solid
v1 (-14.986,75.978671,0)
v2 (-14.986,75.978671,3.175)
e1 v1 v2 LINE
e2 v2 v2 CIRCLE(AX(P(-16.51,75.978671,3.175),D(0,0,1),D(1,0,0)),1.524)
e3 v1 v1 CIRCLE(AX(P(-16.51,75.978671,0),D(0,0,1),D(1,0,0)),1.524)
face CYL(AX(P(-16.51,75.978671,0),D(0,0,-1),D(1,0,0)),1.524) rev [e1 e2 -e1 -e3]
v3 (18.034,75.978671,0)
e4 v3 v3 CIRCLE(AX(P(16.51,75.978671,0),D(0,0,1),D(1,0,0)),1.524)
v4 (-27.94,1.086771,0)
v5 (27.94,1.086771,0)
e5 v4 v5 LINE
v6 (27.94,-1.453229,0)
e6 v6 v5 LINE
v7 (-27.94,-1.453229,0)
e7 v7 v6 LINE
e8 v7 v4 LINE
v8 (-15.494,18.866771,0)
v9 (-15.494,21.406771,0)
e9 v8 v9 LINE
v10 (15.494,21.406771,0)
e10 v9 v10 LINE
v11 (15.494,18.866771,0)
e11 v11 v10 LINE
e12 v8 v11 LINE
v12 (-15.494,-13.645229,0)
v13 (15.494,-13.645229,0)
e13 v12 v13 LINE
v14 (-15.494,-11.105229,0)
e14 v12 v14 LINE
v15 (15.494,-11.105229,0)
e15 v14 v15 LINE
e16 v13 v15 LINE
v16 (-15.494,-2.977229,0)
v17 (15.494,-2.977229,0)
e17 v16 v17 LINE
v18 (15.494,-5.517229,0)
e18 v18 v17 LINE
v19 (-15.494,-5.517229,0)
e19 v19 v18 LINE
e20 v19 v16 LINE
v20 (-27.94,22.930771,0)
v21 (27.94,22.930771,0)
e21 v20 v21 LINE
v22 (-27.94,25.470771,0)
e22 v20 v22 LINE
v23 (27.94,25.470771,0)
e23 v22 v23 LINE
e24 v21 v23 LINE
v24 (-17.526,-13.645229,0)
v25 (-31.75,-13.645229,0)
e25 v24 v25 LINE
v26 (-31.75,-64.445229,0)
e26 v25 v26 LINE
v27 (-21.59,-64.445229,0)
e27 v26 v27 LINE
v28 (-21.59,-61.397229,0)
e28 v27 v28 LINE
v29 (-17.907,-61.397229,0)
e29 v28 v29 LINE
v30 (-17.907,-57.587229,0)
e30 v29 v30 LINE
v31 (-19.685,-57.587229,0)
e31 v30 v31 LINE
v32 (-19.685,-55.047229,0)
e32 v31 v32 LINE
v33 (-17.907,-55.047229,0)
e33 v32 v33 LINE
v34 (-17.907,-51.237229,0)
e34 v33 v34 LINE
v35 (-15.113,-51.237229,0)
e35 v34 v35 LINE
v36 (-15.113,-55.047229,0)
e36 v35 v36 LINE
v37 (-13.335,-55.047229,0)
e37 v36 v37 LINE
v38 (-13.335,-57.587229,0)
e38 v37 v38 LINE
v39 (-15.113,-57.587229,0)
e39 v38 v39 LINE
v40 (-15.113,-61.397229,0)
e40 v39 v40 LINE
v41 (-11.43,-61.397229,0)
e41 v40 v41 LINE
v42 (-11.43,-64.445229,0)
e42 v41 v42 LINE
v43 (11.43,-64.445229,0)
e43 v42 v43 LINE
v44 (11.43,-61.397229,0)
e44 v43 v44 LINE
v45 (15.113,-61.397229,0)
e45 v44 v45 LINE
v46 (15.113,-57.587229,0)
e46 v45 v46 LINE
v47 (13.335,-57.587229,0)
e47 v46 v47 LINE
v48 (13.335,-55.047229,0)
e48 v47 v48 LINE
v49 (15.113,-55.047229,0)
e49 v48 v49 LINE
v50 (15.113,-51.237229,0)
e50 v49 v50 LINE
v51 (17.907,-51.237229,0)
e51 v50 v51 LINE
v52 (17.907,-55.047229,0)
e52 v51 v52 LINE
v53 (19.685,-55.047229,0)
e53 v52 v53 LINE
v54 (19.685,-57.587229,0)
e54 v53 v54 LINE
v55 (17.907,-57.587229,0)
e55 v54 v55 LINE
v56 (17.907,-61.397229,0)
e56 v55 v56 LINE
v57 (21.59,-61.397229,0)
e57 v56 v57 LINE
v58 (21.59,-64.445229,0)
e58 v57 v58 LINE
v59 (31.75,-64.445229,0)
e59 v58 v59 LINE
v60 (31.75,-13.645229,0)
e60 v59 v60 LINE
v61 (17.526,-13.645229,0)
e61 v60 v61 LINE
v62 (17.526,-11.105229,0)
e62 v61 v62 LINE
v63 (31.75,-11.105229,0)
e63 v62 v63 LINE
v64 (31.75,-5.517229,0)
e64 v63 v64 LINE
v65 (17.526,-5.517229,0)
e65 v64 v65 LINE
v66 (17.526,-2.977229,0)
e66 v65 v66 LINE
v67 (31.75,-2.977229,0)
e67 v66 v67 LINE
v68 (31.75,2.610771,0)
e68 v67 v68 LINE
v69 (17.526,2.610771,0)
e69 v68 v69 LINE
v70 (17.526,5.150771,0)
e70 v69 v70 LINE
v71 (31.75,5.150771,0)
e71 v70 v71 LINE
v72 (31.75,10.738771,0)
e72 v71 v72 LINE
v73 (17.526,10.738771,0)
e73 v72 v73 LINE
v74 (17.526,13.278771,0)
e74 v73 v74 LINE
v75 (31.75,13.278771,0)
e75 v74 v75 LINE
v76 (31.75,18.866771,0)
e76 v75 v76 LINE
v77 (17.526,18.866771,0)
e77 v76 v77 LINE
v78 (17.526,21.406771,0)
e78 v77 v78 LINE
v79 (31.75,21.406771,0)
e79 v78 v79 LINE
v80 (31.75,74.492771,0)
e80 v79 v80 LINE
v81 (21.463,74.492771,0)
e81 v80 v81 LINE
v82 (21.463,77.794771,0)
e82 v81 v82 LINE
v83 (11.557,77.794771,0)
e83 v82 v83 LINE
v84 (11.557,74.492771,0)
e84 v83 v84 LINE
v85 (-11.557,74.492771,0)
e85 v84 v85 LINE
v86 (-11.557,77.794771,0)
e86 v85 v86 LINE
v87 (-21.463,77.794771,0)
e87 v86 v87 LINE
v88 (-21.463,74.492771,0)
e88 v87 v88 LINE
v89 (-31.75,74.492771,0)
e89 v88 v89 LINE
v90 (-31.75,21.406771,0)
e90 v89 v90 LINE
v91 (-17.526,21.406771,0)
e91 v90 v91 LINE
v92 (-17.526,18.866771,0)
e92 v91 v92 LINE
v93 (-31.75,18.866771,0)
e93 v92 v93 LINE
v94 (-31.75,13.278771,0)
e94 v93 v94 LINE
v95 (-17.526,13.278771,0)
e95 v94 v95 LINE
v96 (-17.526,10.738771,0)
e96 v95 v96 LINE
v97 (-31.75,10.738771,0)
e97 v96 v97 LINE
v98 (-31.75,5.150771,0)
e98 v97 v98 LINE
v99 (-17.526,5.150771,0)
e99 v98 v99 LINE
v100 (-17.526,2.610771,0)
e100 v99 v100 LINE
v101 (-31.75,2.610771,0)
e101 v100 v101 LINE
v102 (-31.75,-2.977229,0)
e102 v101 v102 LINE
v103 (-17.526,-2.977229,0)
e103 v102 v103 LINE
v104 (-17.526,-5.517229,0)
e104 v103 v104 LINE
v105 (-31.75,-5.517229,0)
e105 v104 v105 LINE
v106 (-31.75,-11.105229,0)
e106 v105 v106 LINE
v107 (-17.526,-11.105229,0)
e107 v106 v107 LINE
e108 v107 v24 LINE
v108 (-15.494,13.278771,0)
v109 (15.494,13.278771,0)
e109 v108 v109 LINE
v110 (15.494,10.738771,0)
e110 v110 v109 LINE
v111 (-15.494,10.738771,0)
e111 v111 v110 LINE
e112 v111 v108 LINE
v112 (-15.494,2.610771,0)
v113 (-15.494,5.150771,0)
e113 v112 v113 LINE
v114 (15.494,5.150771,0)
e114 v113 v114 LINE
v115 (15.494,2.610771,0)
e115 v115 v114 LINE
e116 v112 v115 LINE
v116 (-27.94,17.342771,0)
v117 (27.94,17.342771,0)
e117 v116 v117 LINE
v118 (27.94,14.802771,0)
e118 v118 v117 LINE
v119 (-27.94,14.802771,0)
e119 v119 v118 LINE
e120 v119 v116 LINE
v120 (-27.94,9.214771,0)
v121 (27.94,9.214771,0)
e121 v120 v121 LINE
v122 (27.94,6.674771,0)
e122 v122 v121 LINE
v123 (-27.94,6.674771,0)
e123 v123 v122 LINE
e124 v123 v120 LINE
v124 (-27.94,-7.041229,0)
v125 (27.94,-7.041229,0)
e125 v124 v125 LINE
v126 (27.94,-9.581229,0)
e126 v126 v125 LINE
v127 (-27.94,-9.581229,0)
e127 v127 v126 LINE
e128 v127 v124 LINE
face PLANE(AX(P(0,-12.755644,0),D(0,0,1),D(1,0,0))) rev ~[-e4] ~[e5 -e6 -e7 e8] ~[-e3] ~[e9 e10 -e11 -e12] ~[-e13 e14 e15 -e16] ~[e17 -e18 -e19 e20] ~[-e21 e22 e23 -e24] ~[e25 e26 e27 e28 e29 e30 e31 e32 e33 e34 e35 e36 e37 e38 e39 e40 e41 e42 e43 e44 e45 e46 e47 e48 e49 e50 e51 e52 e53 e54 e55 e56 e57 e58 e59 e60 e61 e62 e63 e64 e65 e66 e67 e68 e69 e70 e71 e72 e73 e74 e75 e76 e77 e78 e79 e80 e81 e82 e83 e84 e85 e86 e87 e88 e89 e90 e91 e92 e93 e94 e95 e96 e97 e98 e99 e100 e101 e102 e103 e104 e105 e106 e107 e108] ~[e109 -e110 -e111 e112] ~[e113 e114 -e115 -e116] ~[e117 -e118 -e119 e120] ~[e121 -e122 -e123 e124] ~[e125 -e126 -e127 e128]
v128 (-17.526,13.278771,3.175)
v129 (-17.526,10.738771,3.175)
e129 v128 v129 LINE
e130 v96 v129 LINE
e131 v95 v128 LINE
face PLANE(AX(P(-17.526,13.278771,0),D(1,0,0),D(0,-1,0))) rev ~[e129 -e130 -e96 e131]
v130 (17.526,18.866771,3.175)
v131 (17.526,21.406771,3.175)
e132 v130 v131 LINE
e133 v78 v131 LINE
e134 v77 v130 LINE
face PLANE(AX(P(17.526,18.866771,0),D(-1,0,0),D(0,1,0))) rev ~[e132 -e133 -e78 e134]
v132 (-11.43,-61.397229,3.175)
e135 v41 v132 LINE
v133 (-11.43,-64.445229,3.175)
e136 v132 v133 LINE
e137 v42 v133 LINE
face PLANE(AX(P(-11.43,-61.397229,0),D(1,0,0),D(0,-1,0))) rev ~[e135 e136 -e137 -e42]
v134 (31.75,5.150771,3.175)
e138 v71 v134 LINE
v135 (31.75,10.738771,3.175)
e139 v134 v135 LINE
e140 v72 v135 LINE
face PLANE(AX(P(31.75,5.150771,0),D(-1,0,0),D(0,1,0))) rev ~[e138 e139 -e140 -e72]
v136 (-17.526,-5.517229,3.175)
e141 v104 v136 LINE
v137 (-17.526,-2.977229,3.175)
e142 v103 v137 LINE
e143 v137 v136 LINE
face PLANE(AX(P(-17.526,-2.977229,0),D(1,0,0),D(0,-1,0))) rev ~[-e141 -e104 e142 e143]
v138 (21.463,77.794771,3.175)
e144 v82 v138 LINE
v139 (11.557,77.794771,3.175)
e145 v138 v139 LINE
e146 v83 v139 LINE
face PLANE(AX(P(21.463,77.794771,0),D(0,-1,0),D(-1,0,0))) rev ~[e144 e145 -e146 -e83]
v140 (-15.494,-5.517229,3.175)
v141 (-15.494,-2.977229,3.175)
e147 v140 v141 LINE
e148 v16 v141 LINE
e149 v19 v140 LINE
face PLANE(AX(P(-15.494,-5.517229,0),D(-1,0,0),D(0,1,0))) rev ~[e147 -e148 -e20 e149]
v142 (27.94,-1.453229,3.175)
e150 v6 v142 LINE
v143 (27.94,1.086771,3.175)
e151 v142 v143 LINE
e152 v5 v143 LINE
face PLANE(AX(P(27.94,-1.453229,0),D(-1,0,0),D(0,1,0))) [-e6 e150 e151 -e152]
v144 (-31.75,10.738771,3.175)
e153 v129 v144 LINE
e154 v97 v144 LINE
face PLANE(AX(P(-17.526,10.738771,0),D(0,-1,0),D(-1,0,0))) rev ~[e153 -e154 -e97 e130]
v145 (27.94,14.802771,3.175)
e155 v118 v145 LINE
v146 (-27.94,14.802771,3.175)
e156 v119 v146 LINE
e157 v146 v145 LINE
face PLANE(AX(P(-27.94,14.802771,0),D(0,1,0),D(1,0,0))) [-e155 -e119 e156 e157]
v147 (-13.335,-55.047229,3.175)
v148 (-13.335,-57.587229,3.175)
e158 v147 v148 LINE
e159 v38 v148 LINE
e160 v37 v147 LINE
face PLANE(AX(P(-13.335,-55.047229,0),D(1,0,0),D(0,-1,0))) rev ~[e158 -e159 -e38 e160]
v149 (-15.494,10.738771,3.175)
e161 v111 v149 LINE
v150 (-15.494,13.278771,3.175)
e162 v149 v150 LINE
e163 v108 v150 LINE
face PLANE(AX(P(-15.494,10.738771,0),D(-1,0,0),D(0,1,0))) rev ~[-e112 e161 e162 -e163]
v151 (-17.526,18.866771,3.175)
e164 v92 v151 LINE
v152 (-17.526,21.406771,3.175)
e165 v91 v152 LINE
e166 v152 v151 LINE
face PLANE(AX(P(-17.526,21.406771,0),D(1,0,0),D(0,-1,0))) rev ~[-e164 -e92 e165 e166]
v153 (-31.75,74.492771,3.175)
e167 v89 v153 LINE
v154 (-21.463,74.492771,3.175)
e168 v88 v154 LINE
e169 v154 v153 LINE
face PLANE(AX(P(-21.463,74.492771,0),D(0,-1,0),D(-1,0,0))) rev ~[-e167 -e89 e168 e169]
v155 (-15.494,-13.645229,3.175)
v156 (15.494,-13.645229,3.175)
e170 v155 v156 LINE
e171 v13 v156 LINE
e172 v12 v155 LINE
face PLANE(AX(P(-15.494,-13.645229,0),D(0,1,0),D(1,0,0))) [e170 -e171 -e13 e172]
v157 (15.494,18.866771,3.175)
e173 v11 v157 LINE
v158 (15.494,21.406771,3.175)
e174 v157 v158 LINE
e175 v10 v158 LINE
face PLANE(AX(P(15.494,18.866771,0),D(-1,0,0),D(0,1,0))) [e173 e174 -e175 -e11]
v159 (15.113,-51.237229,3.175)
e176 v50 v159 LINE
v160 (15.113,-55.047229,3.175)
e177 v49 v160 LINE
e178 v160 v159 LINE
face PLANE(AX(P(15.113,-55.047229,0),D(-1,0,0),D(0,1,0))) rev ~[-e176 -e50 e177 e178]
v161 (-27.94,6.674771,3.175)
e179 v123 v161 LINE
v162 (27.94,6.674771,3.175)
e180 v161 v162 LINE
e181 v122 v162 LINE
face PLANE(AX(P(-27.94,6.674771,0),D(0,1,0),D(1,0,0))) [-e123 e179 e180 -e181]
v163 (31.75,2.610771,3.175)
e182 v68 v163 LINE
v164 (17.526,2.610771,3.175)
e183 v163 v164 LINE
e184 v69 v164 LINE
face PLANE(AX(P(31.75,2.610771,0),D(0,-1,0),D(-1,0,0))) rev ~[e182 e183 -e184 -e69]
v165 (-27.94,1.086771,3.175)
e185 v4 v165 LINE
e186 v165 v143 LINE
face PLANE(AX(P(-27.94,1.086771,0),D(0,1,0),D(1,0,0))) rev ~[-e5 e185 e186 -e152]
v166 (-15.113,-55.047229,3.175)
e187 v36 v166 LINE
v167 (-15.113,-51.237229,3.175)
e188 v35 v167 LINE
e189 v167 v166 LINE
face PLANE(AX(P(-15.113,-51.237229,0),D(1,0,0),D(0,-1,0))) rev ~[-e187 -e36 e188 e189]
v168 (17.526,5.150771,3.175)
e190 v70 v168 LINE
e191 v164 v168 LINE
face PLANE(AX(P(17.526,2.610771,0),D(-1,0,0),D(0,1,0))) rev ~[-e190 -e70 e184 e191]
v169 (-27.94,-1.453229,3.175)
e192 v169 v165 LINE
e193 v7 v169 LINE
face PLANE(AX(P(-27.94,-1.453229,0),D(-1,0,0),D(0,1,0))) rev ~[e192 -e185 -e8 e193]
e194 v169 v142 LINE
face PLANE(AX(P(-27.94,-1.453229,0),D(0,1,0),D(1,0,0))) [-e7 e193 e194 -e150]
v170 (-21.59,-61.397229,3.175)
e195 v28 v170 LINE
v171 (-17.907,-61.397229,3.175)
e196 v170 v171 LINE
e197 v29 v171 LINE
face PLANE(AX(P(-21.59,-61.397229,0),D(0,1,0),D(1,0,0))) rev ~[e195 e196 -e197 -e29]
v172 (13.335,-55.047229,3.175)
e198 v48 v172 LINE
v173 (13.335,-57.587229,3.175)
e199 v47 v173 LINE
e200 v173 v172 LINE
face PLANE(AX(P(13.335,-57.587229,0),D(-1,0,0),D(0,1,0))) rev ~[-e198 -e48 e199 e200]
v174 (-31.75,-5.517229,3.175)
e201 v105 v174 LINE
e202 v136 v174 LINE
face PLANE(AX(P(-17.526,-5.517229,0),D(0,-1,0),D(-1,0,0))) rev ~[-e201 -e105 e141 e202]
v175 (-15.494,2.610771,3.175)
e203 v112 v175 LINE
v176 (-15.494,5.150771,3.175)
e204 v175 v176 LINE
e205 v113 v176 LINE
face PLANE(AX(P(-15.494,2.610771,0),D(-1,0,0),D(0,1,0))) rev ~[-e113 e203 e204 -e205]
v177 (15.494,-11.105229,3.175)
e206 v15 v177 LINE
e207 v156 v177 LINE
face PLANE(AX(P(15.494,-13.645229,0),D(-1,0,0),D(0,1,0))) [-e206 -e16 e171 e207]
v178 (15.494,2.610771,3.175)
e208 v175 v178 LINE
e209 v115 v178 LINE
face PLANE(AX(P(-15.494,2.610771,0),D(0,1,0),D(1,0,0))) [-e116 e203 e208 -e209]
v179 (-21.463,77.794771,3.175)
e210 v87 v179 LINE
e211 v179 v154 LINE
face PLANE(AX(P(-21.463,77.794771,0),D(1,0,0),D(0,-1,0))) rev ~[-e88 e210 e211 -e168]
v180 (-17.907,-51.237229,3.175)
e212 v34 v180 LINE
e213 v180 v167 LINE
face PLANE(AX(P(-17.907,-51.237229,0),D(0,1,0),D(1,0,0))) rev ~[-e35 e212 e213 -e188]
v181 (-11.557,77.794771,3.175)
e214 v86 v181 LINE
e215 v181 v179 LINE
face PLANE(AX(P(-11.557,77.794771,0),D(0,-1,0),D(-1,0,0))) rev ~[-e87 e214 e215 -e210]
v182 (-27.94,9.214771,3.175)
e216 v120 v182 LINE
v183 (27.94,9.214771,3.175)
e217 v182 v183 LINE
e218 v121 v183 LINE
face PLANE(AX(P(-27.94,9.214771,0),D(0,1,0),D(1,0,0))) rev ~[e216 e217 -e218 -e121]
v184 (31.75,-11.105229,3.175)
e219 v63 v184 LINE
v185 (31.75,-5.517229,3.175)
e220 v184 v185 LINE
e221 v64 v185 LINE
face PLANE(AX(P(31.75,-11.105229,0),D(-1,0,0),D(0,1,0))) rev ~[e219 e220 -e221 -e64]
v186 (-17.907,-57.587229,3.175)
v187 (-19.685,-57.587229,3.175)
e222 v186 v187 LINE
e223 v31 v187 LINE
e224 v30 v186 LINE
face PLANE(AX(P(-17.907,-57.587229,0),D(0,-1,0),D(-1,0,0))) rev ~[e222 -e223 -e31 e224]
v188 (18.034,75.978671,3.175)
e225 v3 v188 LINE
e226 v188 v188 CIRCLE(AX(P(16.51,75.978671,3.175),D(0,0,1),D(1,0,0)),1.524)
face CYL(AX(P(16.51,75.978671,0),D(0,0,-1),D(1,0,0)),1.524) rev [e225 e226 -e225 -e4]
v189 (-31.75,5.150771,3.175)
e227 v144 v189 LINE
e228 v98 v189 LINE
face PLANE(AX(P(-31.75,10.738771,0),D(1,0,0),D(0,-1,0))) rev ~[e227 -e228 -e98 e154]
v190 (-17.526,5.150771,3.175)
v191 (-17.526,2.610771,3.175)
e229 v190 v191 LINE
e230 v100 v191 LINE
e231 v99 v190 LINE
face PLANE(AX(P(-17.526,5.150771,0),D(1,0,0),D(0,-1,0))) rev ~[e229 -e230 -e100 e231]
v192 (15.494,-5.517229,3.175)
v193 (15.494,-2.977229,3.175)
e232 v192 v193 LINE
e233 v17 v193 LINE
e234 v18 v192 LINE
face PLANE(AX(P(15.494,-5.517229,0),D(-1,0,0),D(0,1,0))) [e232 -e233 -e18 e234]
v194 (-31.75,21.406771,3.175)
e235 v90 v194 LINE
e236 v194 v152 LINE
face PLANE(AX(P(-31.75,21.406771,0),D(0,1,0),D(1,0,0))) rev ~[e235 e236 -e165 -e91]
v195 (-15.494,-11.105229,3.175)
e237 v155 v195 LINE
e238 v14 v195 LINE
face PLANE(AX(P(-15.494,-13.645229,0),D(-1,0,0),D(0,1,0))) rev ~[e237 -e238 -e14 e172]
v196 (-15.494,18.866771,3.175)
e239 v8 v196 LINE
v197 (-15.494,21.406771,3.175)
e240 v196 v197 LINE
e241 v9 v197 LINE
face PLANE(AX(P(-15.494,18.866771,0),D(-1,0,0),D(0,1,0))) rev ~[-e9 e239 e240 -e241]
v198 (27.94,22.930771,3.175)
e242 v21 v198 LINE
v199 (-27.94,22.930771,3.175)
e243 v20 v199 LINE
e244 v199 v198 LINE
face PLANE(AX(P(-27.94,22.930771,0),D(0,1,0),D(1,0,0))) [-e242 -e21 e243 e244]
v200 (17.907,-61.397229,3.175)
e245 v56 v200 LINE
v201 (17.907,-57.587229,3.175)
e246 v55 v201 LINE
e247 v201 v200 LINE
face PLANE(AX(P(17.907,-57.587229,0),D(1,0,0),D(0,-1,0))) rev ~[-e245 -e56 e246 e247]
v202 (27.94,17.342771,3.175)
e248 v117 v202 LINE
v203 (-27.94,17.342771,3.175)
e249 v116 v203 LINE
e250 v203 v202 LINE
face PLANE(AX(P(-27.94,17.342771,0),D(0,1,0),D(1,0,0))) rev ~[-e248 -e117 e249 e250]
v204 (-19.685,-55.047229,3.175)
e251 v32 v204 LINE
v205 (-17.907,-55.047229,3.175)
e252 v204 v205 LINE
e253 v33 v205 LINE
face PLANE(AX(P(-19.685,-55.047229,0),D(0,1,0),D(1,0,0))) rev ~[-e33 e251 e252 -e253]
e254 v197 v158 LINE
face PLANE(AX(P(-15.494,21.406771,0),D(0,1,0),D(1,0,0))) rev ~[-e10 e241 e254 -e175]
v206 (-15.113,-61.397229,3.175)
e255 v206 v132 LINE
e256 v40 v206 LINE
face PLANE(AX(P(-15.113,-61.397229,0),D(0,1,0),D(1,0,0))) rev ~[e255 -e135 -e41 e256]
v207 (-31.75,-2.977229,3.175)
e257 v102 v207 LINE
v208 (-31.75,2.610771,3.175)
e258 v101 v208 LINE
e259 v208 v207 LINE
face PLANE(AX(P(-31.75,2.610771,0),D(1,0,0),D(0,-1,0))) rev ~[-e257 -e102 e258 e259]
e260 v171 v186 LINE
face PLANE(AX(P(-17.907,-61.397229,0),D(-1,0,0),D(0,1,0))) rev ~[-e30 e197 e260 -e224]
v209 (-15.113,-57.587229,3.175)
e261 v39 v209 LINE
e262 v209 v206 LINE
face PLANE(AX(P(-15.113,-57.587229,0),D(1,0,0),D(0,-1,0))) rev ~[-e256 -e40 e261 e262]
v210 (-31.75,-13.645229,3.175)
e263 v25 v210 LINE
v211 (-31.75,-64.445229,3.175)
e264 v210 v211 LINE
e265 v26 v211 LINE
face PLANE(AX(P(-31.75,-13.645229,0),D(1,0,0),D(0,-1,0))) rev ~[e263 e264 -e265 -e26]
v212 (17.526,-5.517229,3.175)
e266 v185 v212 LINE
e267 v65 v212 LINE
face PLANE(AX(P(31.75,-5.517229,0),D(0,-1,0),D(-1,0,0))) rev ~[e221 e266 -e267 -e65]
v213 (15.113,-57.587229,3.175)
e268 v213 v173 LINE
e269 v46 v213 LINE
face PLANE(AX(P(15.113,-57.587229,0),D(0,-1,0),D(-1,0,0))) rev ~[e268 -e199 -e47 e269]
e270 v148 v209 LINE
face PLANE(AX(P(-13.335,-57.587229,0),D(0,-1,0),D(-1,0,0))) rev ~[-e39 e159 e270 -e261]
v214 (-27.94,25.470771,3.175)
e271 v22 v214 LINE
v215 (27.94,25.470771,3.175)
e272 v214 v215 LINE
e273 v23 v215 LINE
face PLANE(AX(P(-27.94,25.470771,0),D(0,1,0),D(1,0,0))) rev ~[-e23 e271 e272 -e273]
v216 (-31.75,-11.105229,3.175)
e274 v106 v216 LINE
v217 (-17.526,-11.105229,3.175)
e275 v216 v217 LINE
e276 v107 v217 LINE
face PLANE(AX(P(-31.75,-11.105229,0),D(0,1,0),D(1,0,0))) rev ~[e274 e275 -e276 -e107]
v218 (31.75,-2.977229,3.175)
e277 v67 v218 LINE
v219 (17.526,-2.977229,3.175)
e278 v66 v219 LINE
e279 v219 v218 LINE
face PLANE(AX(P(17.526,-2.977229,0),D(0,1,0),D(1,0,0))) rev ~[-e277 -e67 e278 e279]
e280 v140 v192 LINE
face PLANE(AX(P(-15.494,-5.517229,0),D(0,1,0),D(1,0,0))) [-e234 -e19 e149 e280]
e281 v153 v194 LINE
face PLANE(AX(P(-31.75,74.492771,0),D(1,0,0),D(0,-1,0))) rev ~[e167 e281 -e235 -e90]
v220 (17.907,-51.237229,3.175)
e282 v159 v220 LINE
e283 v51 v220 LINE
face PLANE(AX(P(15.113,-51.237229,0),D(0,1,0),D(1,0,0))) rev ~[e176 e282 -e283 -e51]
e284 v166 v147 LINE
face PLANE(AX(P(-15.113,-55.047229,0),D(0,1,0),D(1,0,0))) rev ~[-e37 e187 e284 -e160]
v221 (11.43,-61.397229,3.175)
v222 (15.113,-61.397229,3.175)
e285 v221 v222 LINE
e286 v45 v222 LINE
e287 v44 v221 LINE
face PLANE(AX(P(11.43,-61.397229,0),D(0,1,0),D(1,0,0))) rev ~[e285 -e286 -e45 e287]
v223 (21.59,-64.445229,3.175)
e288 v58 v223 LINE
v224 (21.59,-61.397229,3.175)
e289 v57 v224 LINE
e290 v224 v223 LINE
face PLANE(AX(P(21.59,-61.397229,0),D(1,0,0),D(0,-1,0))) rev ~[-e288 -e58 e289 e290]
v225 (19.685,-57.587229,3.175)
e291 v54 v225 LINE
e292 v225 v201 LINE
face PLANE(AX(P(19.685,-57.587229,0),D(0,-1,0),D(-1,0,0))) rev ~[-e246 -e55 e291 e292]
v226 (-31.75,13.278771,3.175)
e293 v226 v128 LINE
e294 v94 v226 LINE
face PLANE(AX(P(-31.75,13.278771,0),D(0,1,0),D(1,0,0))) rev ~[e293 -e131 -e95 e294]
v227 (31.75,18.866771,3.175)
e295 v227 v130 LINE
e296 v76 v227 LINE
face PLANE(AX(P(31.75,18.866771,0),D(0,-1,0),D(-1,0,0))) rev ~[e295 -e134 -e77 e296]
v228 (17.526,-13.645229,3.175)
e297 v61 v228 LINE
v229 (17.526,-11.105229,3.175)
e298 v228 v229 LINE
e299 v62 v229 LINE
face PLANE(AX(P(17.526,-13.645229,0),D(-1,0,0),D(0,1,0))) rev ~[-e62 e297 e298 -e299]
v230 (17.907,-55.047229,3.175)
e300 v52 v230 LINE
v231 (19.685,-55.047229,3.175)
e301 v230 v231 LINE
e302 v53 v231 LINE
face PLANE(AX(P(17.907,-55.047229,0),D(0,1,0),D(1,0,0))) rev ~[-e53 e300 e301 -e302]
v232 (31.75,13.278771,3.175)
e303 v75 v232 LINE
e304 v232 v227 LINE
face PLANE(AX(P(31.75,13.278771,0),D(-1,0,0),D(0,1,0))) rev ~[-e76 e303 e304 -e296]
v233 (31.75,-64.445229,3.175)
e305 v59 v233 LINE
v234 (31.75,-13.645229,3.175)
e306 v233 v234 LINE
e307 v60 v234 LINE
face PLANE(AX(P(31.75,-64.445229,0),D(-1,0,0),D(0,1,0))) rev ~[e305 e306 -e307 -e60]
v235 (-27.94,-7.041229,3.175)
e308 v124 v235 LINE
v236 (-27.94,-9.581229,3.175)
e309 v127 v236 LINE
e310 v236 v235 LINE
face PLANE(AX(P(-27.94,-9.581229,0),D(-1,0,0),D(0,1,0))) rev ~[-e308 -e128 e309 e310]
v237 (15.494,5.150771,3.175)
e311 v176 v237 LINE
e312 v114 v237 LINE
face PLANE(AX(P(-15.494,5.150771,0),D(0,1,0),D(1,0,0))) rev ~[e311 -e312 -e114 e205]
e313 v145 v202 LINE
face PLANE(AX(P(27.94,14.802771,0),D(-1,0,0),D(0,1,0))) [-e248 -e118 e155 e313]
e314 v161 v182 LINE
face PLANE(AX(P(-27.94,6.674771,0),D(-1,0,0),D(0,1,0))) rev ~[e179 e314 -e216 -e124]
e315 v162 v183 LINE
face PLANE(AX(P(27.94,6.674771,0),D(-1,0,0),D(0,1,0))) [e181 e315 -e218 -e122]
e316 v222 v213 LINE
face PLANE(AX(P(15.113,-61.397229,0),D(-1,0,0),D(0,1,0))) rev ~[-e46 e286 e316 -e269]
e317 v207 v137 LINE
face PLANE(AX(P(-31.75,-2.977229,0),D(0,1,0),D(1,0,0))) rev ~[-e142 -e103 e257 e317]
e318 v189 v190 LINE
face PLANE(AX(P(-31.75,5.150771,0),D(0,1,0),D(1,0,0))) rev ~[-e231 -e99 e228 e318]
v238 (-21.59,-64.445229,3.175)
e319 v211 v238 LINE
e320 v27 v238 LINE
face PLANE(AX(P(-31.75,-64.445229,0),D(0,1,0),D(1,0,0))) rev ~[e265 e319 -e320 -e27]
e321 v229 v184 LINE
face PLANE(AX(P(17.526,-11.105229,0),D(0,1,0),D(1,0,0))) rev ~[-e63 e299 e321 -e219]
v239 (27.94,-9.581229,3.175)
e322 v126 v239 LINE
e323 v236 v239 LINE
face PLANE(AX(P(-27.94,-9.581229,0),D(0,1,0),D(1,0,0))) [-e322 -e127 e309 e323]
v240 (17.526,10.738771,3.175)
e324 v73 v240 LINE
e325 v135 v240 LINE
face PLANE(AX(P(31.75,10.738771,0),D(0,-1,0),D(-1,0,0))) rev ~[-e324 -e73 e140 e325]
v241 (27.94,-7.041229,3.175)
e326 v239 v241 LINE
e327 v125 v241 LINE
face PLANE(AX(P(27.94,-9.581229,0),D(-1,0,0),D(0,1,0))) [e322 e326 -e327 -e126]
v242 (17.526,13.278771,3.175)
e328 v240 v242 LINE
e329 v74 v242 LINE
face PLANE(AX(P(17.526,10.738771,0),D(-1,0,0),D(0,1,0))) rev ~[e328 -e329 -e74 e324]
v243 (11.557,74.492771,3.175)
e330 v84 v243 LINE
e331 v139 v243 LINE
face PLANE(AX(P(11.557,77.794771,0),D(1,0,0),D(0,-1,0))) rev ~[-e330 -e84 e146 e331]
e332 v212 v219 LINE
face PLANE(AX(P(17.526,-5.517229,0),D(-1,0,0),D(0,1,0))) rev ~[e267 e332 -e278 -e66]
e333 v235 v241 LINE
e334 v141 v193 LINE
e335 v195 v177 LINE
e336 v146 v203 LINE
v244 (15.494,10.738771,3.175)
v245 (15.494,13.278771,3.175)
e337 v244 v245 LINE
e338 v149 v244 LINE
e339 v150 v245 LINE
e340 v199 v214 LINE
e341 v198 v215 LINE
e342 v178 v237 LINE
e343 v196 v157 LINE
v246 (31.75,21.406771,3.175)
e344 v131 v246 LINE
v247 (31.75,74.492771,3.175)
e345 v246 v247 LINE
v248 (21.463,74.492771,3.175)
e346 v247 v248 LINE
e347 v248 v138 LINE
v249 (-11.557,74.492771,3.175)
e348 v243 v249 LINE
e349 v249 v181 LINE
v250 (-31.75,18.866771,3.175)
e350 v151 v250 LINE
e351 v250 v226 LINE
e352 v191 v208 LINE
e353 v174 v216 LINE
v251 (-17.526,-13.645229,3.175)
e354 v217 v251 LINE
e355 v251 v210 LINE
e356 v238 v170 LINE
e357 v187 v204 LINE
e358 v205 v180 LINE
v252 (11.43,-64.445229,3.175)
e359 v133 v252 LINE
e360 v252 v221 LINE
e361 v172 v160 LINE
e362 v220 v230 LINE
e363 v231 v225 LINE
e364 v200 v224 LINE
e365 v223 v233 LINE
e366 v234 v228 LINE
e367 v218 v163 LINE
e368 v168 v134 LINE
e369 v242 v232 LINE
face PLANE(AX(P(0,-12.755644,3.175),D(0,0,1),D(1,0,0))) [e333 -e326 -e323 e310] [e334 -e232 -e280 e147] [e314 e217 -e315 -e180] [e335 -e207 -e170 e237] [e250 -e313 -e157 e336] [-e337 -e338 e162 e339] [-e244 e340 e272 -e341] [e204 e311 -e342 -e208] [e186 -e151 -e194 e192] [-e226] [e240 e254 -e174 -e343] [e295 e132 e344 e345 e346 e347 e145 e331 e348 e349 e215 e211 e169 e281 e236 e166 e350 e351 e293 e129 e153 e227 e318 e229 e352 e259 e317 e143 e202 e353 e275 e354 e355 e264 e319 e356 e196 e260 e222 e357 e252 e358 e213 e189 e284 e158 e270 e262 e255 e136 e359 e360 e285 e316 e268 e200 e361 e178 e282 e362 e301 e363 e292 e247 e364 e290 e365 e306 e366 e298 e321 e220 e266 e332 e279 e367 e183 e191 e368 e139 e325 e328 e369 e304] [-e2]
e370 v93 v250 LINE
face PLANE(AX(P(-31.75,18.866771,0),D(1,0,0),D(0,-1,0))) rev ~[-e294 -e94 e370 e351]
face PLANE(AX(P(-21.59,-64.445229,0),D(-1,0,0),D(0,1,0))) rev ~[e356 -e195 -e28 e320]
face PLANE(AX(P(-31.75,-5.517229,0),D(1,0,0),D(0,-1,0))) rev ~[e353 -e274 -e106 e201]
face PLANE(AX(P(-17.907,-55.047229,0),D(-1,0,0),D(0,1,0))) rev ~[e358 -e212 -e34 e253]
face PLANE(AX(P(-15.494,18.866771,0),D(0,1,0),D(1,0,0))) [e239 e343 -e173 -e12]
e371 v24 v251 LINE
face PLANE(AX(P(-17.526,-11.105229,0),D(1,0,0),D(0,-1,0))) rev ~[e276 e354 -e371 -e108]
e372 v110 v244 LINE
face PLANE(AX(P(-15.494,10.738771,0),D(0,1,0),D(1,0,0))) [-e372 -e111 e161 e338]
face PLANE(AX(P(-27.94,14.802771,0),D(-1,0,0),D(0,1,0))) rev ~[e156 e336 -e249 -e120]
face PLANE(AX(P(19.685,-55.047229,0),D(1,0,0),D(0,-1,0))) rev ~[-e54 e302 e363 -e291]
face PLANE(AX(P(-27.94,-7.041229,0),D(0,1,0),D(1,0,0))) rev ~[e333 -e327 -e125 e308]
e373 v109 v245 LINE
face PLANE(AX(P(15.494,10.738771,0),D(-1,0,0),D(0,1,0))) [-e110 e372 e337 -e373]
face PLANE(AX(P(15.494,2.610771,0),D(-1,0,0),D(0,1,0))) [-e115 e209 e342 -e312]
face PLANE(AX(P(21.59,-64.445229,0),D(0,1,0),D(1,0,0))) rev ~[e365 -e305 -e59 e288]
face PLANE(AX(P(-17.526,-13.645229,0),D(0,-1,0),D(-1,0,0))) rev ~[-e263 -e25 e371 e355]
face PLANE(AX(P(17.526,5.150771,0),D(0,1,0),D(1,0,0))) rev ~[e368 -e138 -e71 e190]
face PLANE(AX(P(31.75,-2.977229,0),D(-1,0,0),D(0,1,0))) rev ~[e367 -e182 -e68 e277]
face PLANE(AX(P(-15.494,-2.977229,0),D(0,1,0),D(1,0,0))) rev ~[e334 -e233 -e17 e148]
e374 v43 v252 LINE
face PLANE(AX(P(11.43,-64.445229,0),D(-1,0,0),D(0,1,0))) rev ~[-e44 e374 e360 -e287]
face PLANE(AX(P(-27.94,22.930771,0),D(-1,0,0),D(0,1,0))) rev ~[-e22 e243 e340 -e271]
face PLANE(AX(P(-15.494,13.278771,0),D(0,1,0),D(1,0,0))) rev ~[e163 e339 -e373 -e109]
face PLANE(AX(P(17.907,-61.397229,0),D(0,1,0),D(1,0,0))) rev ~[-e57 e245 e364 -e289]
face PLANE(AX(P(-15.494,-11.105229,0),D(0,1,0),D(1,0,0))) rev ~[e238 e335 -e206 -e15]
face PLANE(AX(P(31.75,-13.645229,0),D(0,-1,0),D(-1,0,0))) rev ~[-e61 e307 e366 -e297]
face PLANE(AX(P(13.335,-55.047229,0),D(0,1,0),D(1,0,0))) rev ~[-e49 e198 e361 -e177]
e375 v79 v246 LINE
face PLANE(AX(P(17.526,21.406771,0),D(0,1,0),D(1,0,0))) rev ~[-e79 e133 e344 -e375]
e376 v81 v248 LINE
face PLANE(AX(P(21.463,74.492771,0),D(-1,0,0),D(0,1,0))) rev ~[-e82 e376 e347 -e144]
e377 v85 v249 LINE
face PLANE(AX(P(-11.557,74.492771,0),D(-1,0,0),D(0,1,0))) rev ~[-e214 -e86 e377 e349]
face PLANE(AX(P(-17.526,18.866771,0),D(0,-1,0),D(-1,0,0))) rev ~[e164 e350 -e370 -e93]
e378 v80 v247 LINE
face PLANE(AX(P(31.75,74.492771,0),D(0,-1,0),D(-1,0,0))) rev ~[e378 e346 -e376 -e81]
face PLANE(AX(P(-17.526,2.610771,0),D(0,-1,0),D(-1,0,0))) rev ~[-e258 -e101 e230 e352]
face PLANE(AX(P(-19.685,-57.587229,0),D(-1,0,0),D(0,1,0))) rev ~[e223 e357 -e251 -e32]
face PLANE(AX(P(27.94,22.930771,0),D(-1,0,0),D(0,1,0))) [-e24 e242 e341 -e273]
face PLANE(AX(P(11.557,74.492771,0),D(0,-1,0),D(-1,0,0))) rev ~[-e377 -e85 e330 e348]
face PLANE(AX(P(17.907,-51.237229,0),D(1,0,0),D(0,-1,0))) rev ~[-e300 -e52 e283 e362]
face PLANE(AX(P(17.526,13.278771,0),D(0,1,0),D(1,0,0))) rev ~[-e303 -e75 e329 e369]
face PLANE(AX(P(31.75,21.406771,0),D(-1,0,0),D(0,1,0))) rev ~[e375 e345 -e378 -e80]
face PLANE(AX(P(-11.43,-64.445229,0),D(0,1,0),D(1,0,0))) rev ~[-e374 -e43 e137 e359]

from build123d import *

# Parameters (mm, degrees)
F0_W     = 30.988
F0_H     = 2.54
F0_W_2   = 55.88
F0_R     = 1.524
F1_DEPTH = 3.175


# Not quite as in the source:
# - a length typed as a fraction of an inch, garbled in the dataset ("3 / 203.2 mm" for 3/8 in), is restored
# - a feature names something its author has since deleted; it is built from what else it names


with BuildPart() as f1:
    # F0 (on Top) → F1 (new body)
    with BuildSketch(Plane.XY):
        Polygon((21.59, -64.4452290503), (31.75, -64.4452290503), (31.75, -13.6452290503), (17.526, -13.6452290503), (17.526, -11.1052290503), (31.75, -11.1052290503), (31.75, -5.5172290503), (17.526, -5.5172290503), (17.526, -2.9772290503), (31.75, -2.9772290503), (31.75, 2.6107709497), (17.526, 2.6107709497), (17.526, 5.1507709497), (31.75, 5.1507709497), (31.75, 10.7387709497), (17.526, 10.7387709497), (17.526, 13.2787709497), (31.75, 13.2787709497), (31.75, 18.8667709497), (17.526, 18.8667709497), (17.526, 21.4067709497), (31.75, 21.4067709497), (31.75, 26.9947709497), (-31.75, 26.9947709497), (-31.75, 21.4067709497), (-17.526, 21.4067709497), (-17.526, 18.8667709497), (-31.75, 18.8667709497), (-31.75, 13.2787709497), (-17.526, 13.2787709497), (-17.526, 10.7387709497), (-31.75, 10.7387709497), (-31.75, 5.1507709497), (-17.526, 5.1507709497), (-17.526, 2.6107709497), (-31.75, 2.6107709497), (-31.75, -2.9772290503), (-17.526, -2.9772290503), (-17.526, -5.5172290503), (-31.75, -5.5172290503), (-31.75, -11.1052290503), (-17.526, -11.1052290503), (-17.526, -13.6452290503), (-31.75, -13.6452290503), (-31.75, -64.4452290503), (-21.59, -64.4452290503), (-21.59, -61.3972290503), (-17.907, -61.3972290503), (-17.907, -57.5872290503), (-19.685, -57.5872290503), (-19.685, -55.0472290503), (-17.907, -55.0472290503), (-17.907, -51.2372290503), (-15.113, -51.2372290503), (-15.113, -55.0472290503), (-13.335, -55.0472290503), (-13.335, -57.5872290503), (-15.113, -57.5872290503), (-15.113, -61.3972290503), (-11.43, -61.3972290503), (-11.43, -64.4452290503), (11.43, -64.4452290503), (11.43, -61.3972290503), (15.113, -61.3972290503), (15.113, -57.5872290503), (13.335, -57.5872290503), (13.335, -55.0472290503), (15.113, -55.0472290503), (15.113, -51.2372290503), (17.907, -51.2372290503), (17.907, -55.0472290503), (19.685, -55.0472290503), (19.685, -57.5872290503), (17.907, -57.5872290503), (17.907, -61.3972290503), (21.59, -61.3972290503), align=None)
        with Locations((0, -12.3752290503)):
            Rectangle(F0_W, F0_H, mode=Mode.SUBTRACT)
        with Locations((0, -8.3112290503)):
            Rectangle(F0_W_2, F0_H, mode=Mode.SUBTRACT)
        with Locations((0, -4.2472290503)):
            Rectangle(F0_W, F0_H, mode=Mode.SUBTRACT)
        with Locations((0, -0.1832290503)):
            Rectangle(F0_W_2, F0_H, mode=Mode.SUBTRACT)
        with Locations((0, 3.8807709497)):
            Rectangle(F0_W, F0_H, mode=Mode.SUBTRACT)
        with Locations((0, 7.9447709497)):
            Rectangle(F0_W_2, F0_H, mode=Mode.SUBTRACT)
        with Locations((0, 12.0087709497)):
            Rectangle(F0_W, F0_H, mode=Mode.SUBTRACT)
        with Locations((0, 16.0727709497)):
            Rectangle(F0_W_2, F0_H, mode=Mode.SUBTRACT)
        with Locations((0, 20.1367709497)):
            Rectangle(F0_W, F0_H, mode=Mode.SUBTRACT)
        with Locations((0, 24.2007709497)):
            Rectangle(F0_W_2, F0_H, mode=Mode.SUBTRACT)
        Polygon((-31.75, 26.9947709497), (31.75, 26.9947709497), (31.75, 74.4927709497), (21.463, 74.4927709497), (21.463, 77.7947709497), (11.557, 77.7947709497), (11.557, 74.4927709497), (-11.557, 74.4927709497), (-11.557, 77.7947709497), (-21.463, 77.7947709497), (-21.463, 74.4927709497), (-31.75, 74.4927709497), align=None)
        with Locations((-16.51, 75.9786709497)):
            Circle(F0_R, mode=Mode.SUBTRACT)
        with Locations((16.51, 75.9786709497)):
            Circle(F0_R, mode=Mode.SUBTRACT)
    extrude(amount=F1_DEPTH)


solid = f1.part
